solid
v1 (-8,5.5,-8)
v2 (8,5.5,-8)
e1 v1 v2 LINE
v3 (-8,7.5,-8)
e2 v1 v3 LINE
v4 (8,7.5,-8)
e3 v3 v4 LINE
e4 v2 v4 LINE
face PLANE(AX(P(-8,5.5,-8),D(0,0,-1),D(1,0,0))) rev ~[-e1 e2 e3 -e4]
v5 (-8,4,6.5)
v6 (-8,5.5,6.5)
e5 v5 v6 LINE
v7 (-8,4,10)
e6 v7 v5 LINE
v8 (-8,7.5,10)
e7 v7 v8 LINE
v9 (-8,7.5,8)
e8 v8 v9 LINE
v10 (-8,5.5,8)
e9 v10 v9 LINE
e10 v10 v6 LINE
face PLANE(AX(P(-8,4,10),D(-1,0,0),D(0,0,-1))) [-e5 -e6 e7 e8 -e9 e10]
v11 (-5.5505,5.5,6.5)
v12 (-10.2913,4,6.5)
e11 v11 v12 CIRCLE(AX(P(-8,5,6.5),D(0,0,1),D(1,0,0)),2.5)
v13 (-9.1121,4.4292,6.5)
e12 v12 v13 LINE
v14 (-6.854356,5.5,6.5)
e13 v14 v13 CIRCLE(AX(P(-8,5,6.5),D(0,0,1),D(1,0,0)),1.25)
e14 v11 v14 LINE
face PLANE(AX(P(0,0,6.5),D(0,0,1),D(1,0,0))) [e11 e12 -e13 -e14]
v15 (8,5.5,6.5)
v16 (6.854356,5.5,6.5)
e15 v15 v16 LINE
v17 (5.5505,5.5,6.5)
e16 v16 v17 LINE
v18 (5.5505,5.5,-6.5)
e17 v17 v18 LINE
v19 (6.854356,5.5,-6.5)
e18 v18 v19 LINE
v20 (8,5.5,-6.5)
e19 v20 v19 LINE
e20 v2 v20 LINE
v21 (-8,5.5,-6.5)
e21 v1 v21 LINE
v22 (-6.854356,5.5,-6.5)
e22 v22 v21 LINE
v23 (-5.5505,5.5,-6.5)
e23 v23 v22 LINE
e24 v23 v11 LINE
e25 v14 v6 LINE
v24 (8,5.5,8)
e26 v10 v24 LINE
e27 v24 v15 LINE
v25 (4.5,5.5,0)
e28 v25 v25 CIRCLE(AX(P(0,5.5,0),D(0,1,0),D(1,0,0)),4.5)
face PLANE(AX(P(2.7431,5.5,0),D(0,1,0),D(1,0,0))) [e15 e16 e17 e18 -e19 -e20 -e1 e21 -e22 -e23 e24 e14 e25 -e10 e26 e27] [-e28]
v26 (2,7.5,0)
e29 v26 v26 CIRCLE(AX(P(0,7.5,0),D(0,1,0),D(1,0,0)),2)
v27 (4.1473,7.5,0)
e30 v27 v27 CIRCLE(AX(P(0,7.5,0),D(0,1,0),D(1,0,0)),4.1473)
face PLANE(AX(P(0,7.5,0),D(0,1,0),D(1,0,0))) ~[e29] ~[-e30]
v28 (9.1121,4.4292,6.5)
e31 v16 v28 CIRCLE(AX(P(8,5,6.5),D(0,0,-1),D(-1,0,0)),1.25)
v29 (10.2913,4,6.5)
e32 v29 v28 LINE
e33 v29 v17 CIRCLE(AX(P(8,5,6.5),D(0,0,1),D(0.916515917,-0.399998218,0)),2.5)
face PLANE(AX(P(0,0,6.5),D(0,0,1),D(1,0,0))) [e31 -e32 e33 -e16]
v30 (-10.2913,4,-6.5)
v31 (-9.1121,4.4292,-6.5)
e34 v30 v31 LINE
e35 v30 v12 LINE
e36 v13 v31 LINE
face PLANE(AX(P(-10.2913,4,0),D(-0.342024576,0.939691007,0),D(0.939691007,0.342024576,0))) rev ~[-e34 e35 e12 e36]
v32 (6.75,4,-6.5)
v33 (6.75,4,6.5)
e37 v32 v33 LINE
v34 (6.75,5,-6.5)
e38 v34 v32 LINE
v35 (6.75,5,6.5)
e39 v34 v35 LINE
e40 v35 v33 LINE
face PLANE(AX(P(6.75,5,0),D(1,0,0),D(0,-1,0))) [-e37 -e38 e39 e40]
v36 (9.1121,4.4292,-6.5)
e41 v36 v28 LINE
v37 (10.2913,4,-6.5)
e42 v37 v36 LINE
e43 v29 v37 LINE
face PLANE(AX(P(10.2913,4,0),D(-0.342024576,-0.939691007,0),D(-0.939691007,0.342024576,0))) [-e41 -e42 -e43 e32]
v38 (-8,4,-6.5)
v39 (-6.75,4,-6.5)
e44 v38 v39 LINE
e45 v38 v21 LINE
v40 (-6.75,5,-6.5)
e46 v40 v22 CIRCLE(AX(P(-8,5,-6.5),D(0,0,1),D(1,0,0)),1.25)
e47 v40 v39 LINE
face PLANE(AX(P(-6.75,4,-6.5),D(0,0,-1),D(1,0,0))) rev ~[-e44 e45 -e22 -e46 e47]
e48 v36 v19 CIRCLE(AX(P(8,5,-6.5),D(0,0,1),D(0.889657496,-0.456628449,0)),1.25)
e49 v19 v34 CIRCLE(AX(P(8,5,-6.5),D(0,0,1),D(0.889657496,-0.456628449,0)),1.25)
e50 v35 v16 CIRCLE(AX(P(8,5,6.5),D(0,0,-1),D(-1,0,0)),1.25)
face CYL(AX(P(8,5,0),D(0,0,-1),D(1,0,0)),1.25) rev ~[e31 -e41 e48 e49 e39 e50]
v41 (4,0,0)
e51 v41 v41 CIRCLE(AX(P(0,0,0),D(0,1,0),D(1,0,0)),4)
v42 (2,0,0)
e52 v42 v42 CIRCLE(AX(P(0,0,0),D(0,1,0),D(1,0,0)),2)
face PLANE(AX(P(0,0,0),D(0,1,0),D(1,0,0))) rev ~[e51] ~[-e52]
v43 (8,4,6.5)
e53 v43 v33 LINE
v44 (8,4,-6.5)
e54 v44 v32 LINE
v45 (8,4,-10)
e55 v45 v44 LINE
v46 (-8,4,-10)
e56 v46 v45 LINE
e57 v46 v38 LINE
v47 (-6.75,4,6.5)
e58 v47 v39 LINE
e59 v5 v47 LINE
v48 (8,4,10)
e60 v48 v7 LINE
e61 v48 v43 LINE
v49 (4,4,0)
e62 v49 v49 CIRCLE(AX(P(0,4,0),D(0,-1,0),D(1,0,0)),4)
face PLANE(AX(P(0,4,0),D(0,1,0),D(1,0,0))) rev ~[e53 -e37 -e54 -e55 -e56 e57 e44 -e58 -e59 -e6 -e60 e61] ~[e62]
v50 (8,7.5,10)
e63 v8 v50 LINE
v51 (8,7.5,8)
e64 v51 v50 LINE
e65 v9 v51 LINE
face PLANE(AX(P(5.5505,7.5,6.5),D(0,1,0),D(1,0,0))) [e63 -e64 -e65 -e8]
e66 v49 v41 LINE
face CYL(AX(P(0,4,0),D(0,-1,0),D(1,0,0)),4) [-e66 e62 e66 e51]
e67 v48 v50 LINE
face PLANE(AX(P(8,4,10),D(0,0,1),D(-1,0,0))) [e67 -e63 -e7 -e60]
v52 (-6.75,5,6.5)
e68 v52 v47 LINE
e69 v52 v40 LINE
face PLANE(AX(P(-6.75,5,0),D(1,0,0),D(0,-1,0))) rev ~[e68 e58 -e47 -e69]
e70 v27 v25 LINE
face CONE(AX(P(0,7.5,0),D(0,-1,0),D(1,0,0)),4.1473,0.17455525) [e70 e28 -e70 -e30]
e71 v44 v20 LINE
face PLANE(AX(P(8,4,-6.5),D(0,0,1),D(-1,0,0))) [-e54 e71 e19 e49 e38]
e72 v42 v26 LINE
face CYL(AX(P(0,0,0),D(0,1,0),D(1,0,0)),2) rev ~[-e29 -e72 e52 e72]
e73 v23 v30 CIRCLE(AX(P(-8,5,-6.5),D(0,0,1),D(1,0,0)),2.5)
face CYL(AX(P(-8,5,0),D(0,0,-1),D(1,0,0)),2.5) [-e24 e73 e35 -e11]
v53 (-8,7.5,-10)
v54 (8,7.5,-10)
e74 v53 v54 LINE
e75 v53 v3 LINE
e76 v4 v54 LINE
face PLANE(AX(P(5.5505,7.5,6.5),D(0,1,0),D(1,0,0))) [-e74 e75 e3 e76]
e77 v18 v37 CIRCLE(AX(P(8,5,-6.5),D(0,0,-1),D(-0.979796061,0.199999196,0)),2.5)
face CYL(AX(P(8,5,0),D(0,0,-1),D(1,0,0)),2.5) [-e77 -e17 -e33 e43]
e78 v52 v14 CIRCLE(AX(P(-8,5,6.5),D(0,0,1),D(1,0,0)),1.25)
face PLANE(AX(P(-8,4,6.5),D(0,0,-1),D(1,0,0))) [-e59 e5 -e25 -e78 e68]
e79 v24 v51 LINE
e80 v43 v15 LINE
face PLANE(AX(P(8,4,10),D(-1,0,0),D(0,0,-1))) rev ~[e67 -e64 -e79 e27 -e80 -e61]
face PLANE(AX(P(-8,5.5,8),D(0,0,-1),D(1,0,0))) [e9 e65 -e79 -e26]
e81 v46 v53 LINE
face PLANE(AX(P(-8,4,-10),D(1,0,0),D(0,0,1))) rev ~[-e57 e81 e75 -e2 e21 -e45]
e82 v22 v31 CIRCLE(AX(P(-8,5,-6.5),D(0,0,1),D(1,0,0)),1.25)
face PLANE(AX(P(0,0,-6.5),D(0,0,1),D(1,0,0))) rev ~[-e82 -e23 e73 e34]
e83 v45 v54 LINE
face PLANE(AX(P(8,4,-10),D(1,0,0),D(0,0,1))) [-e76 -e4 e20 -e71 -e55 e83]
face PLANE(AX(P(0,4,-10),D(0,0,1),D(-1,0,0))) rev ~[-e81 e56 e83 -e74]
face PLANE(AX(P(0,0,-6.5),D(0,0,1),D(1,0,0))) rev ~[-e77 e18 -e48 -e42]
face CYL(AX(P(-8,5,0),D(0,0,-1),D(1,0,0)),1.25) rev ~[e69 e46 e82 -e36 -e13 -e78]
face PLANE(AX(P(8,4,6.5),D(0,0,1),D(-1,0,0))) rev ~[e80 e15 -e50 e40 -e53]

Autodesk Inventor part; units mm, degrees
ref_plane "YZ Plane" through (0, 0, 0) normal (1, 0, 0) x (0, 1, 0)
ref_plane "XZ Plane" through (0, 0, 0) normal (0, 1, 0) x (-1, 0, 0)
ref_plane "XY Plane" through (0, 0, 0) normal (0, 0, 1) x (1, 0, 0)
sketch "Sketch2" plane through (0, 0, 0) normal (0, 0, 1) x (1, 0, 0)
  line L0 (0, 0) -> (0, 8.3073) construction
  line L1 (2, 0) -> (2, 7.5)
  line L2 (2, 7.5) -> (4.1473, 7.5)
  line L3 (4.1473, 7.5) -> (4.5, 5.5)
  line L4 (4.5, 5.5) -> (4.5, 4)
  line L5 (4.5, 4) -> (4, 4)
  line L6 (4, 4) -> (4, 0)
  line L7 (4, 0) -> (2, 0)
  dimension "d1" = 4
  dimension "d2" = 7.5
  dimension "d3" = 3.5
  dimension "d4" = 10
  dimension "d5" = 8
  dimension "d6" = 9
  dimension "d7" = 2
revolve "Revolution1" add sketch "Sketch2" angle 360 about axis through (0, 0, 0) along (0, 1, 0)
sketch "Sketch3" plane through (0, 0, 0) normal (0, 0, 1) x (1, 0, 0)
  line L0 (0, 0) -> (0, 7.5)
  line L1 (-4.1473, 7.5) -> (4.1473, 7.5) projected
  circle A0 centre (-8, 5) radius 1.25
  circle A1 centre (-8, 5) radius 2.5
  line L2 (-4.5, 4) -> (4.5, 4) projected
  line L3 (-7.25, 4) -> (-4.5, 4)
  line L4 (-4.5, 5.5) -> (-4.5, 4) projected
  line L5 (-4.5, 5.5) -> (-5.5505, 5.5)
  circle A2 centre (8, 5) radius 1.25
  circle A3 centre (8, 5) radius 2.5
  line L6 (7.25, 4) -> (4.5, 4)
  line L7 (4.5, 5.5) -> (5.5505, 5.5)
  line L8 (-10.2913, 4) -> (-9.1121, 4.4292)
  line L9 (-8, 5) -> (-8, -2.6119) construction
  line L10 (-4.5, 5.5) -> (-2.8248, 5.5)
  line L11 (-4.5, 5.5) -> (4.5, 5.5) projected
  line L12 (-2.8248, 4) -> (-2.8248, 5.5)
  line L13 (4.5, 5.5) -> (2.7431, 5.5)
  line L14 (2.7431, 5.5) -> (2.7431, 4)
  line L15 (10.2913, 4) -> (9.1121, 4.4292)
  line L16 (-6.75, 5) -> (-6.75, 4)
  line L17 (6.75, 5) -> (6.75, 4)
  dimension "d9" = 5
  dimension "d10" = 2.5
  dimension "d11" = 16
  dimension "d12" = 70
extrude "Extrusion1" add sketch "Sketch3" along normal mid plane 13 contours L2 L4 L10 L12 | L14 L11 L7 A3 L6 L2 | L3 A1 L5 L4 | L3 L16 A0 L8 A1 | A3 L15 A2 L17 L6
sketch "Sketch4" plane through (2.7431, 4, -6.5) normal (0, -1, 0) x (1, 0, 0)
  line L0 (-9.4931, 0) -> (-9.4931, 13) projected
  line L1 (4.0069, 13) -> (4.0069, 0) projected
  line L2 (5.2569, -3.5) -> (-10.7431, -3.5)
  line L3 (-2.7431, -3.5) -> (-2.7431, 6.5)
  line L4 (5.2569, -3.5) -> (5.2569, 0)
  line L5 (0, 0) -> (2.8074, 0) projected
  line L6 (5.2569, 0) -> (0, 0)
  line L7 (0, 0) -> (0, 2.8945)
  arc A0 (-5.5678, 2.997) -> (0, 2.9327) centre (-2.7431, 6.5) ccw projected
  line L8 (-10.7431, -3.5) -> (-10.7431, 0)
  line L9 (-8.2936, 0) -> (-5.5678, 0) projected
  line L10 (-10.7431, 0) -> (-5.5678, 0)
  line L11 (-5.5678, 0) -> (-5.5678, 2.997) projected
  line L12 (-5.5678, 0) -> (-5.5678, 2.997)
  line L13 (-2.7431, 6.5) -> (4.0069, 6.5)
  line L14 (5.2569, 16.5) -> (-10.7431, 16.5)
  line L15 (5.2569, 16.5) -> (5.2569, 13)
  line L16 (0, 13) -> (2.8074, 13)
  line L17 (5.2569, 13) -> (0, 13)
  line L18 (0, 13) -> (0, 10.1055)
  arc A1 (0, 10.0673) -> (-5.5678, 10.003) centre (-2.7431, 6.5) ccw
  line L19 (-10.7431, 16.5) -> (-10.7431, 13)
  line L20 (-8.2936, 13) -> (-5.5678, 13)
  line L21 (-10.7431, 13) -> (-5.5678, 13)
  line L22 (-5.5678, 13) -> (-5.5678, 10.003)
  line L23 (-5.5678, 13) -> (-5.5678, 10.003)
  arc A2 (0, 2.9327) -> (0, 10.0673) centre (-2.7431, 6.5) ccw projected
  arc A3 (-5.5678, 10.003) -> (-5.5678, 2.997) centre (-2.7431, 6.5) ccw projected
  point P0 (-2.7431, 16.5)
  dimension "d15" = 16
  dimension "d21" = 20
extrude "Extrusion2" add sketch "Sketch4" against normal up to surface (1.5 mm away) contours L10 L9 L11 A0 L3 L2 L8 | L21 L19 L14 L15 L17 L1 L13 A2 A1 L22 L20 | L3 A0 A2 L13 L1 L6 L4 L2
sketch "Sketch5" plane through (5.5505, 5.5, 6.5) normal (0, 1, 0) x (1, 0, 0)
  line L0 (-5.5505, 6.5) -> (4.9752, 6.5)
  line L1 (-13.5505, 16.5) -> (2.4495, 16.5) projected
  line L2 (2.4495, 16.5) -> (-13.5505, 16.5)
  line L3 (-13.5505, 16.5) -> (-13.5505, 14.5)
  line L4 (-13.5505, 14.5) -> (2.4495, 14.5)
  line L5 (2.4495, 14.5) -> (2.4495, 16.5)
  line L6 (-13.5505, -3.5) -> (2.4495, -3.5)
  line L7 (2.4495, -3.5) -> (-13.5505, -3.5)
  line L8 (-13.5505, -3.5) -> (-13.5505, -1.5)
  line L9 (-13.5505, -1.5) -> (2.4495, -1.5)
  line L10 (2.4495, -1.5) -> (2.4495, -3.5)
  dimension "d18" = 16
extrude "Extrusion3" add sketch "Sketch5" along normal up to surface (2 mm away)
properties part number "18102021-002-06" material "Stainless Steel"
